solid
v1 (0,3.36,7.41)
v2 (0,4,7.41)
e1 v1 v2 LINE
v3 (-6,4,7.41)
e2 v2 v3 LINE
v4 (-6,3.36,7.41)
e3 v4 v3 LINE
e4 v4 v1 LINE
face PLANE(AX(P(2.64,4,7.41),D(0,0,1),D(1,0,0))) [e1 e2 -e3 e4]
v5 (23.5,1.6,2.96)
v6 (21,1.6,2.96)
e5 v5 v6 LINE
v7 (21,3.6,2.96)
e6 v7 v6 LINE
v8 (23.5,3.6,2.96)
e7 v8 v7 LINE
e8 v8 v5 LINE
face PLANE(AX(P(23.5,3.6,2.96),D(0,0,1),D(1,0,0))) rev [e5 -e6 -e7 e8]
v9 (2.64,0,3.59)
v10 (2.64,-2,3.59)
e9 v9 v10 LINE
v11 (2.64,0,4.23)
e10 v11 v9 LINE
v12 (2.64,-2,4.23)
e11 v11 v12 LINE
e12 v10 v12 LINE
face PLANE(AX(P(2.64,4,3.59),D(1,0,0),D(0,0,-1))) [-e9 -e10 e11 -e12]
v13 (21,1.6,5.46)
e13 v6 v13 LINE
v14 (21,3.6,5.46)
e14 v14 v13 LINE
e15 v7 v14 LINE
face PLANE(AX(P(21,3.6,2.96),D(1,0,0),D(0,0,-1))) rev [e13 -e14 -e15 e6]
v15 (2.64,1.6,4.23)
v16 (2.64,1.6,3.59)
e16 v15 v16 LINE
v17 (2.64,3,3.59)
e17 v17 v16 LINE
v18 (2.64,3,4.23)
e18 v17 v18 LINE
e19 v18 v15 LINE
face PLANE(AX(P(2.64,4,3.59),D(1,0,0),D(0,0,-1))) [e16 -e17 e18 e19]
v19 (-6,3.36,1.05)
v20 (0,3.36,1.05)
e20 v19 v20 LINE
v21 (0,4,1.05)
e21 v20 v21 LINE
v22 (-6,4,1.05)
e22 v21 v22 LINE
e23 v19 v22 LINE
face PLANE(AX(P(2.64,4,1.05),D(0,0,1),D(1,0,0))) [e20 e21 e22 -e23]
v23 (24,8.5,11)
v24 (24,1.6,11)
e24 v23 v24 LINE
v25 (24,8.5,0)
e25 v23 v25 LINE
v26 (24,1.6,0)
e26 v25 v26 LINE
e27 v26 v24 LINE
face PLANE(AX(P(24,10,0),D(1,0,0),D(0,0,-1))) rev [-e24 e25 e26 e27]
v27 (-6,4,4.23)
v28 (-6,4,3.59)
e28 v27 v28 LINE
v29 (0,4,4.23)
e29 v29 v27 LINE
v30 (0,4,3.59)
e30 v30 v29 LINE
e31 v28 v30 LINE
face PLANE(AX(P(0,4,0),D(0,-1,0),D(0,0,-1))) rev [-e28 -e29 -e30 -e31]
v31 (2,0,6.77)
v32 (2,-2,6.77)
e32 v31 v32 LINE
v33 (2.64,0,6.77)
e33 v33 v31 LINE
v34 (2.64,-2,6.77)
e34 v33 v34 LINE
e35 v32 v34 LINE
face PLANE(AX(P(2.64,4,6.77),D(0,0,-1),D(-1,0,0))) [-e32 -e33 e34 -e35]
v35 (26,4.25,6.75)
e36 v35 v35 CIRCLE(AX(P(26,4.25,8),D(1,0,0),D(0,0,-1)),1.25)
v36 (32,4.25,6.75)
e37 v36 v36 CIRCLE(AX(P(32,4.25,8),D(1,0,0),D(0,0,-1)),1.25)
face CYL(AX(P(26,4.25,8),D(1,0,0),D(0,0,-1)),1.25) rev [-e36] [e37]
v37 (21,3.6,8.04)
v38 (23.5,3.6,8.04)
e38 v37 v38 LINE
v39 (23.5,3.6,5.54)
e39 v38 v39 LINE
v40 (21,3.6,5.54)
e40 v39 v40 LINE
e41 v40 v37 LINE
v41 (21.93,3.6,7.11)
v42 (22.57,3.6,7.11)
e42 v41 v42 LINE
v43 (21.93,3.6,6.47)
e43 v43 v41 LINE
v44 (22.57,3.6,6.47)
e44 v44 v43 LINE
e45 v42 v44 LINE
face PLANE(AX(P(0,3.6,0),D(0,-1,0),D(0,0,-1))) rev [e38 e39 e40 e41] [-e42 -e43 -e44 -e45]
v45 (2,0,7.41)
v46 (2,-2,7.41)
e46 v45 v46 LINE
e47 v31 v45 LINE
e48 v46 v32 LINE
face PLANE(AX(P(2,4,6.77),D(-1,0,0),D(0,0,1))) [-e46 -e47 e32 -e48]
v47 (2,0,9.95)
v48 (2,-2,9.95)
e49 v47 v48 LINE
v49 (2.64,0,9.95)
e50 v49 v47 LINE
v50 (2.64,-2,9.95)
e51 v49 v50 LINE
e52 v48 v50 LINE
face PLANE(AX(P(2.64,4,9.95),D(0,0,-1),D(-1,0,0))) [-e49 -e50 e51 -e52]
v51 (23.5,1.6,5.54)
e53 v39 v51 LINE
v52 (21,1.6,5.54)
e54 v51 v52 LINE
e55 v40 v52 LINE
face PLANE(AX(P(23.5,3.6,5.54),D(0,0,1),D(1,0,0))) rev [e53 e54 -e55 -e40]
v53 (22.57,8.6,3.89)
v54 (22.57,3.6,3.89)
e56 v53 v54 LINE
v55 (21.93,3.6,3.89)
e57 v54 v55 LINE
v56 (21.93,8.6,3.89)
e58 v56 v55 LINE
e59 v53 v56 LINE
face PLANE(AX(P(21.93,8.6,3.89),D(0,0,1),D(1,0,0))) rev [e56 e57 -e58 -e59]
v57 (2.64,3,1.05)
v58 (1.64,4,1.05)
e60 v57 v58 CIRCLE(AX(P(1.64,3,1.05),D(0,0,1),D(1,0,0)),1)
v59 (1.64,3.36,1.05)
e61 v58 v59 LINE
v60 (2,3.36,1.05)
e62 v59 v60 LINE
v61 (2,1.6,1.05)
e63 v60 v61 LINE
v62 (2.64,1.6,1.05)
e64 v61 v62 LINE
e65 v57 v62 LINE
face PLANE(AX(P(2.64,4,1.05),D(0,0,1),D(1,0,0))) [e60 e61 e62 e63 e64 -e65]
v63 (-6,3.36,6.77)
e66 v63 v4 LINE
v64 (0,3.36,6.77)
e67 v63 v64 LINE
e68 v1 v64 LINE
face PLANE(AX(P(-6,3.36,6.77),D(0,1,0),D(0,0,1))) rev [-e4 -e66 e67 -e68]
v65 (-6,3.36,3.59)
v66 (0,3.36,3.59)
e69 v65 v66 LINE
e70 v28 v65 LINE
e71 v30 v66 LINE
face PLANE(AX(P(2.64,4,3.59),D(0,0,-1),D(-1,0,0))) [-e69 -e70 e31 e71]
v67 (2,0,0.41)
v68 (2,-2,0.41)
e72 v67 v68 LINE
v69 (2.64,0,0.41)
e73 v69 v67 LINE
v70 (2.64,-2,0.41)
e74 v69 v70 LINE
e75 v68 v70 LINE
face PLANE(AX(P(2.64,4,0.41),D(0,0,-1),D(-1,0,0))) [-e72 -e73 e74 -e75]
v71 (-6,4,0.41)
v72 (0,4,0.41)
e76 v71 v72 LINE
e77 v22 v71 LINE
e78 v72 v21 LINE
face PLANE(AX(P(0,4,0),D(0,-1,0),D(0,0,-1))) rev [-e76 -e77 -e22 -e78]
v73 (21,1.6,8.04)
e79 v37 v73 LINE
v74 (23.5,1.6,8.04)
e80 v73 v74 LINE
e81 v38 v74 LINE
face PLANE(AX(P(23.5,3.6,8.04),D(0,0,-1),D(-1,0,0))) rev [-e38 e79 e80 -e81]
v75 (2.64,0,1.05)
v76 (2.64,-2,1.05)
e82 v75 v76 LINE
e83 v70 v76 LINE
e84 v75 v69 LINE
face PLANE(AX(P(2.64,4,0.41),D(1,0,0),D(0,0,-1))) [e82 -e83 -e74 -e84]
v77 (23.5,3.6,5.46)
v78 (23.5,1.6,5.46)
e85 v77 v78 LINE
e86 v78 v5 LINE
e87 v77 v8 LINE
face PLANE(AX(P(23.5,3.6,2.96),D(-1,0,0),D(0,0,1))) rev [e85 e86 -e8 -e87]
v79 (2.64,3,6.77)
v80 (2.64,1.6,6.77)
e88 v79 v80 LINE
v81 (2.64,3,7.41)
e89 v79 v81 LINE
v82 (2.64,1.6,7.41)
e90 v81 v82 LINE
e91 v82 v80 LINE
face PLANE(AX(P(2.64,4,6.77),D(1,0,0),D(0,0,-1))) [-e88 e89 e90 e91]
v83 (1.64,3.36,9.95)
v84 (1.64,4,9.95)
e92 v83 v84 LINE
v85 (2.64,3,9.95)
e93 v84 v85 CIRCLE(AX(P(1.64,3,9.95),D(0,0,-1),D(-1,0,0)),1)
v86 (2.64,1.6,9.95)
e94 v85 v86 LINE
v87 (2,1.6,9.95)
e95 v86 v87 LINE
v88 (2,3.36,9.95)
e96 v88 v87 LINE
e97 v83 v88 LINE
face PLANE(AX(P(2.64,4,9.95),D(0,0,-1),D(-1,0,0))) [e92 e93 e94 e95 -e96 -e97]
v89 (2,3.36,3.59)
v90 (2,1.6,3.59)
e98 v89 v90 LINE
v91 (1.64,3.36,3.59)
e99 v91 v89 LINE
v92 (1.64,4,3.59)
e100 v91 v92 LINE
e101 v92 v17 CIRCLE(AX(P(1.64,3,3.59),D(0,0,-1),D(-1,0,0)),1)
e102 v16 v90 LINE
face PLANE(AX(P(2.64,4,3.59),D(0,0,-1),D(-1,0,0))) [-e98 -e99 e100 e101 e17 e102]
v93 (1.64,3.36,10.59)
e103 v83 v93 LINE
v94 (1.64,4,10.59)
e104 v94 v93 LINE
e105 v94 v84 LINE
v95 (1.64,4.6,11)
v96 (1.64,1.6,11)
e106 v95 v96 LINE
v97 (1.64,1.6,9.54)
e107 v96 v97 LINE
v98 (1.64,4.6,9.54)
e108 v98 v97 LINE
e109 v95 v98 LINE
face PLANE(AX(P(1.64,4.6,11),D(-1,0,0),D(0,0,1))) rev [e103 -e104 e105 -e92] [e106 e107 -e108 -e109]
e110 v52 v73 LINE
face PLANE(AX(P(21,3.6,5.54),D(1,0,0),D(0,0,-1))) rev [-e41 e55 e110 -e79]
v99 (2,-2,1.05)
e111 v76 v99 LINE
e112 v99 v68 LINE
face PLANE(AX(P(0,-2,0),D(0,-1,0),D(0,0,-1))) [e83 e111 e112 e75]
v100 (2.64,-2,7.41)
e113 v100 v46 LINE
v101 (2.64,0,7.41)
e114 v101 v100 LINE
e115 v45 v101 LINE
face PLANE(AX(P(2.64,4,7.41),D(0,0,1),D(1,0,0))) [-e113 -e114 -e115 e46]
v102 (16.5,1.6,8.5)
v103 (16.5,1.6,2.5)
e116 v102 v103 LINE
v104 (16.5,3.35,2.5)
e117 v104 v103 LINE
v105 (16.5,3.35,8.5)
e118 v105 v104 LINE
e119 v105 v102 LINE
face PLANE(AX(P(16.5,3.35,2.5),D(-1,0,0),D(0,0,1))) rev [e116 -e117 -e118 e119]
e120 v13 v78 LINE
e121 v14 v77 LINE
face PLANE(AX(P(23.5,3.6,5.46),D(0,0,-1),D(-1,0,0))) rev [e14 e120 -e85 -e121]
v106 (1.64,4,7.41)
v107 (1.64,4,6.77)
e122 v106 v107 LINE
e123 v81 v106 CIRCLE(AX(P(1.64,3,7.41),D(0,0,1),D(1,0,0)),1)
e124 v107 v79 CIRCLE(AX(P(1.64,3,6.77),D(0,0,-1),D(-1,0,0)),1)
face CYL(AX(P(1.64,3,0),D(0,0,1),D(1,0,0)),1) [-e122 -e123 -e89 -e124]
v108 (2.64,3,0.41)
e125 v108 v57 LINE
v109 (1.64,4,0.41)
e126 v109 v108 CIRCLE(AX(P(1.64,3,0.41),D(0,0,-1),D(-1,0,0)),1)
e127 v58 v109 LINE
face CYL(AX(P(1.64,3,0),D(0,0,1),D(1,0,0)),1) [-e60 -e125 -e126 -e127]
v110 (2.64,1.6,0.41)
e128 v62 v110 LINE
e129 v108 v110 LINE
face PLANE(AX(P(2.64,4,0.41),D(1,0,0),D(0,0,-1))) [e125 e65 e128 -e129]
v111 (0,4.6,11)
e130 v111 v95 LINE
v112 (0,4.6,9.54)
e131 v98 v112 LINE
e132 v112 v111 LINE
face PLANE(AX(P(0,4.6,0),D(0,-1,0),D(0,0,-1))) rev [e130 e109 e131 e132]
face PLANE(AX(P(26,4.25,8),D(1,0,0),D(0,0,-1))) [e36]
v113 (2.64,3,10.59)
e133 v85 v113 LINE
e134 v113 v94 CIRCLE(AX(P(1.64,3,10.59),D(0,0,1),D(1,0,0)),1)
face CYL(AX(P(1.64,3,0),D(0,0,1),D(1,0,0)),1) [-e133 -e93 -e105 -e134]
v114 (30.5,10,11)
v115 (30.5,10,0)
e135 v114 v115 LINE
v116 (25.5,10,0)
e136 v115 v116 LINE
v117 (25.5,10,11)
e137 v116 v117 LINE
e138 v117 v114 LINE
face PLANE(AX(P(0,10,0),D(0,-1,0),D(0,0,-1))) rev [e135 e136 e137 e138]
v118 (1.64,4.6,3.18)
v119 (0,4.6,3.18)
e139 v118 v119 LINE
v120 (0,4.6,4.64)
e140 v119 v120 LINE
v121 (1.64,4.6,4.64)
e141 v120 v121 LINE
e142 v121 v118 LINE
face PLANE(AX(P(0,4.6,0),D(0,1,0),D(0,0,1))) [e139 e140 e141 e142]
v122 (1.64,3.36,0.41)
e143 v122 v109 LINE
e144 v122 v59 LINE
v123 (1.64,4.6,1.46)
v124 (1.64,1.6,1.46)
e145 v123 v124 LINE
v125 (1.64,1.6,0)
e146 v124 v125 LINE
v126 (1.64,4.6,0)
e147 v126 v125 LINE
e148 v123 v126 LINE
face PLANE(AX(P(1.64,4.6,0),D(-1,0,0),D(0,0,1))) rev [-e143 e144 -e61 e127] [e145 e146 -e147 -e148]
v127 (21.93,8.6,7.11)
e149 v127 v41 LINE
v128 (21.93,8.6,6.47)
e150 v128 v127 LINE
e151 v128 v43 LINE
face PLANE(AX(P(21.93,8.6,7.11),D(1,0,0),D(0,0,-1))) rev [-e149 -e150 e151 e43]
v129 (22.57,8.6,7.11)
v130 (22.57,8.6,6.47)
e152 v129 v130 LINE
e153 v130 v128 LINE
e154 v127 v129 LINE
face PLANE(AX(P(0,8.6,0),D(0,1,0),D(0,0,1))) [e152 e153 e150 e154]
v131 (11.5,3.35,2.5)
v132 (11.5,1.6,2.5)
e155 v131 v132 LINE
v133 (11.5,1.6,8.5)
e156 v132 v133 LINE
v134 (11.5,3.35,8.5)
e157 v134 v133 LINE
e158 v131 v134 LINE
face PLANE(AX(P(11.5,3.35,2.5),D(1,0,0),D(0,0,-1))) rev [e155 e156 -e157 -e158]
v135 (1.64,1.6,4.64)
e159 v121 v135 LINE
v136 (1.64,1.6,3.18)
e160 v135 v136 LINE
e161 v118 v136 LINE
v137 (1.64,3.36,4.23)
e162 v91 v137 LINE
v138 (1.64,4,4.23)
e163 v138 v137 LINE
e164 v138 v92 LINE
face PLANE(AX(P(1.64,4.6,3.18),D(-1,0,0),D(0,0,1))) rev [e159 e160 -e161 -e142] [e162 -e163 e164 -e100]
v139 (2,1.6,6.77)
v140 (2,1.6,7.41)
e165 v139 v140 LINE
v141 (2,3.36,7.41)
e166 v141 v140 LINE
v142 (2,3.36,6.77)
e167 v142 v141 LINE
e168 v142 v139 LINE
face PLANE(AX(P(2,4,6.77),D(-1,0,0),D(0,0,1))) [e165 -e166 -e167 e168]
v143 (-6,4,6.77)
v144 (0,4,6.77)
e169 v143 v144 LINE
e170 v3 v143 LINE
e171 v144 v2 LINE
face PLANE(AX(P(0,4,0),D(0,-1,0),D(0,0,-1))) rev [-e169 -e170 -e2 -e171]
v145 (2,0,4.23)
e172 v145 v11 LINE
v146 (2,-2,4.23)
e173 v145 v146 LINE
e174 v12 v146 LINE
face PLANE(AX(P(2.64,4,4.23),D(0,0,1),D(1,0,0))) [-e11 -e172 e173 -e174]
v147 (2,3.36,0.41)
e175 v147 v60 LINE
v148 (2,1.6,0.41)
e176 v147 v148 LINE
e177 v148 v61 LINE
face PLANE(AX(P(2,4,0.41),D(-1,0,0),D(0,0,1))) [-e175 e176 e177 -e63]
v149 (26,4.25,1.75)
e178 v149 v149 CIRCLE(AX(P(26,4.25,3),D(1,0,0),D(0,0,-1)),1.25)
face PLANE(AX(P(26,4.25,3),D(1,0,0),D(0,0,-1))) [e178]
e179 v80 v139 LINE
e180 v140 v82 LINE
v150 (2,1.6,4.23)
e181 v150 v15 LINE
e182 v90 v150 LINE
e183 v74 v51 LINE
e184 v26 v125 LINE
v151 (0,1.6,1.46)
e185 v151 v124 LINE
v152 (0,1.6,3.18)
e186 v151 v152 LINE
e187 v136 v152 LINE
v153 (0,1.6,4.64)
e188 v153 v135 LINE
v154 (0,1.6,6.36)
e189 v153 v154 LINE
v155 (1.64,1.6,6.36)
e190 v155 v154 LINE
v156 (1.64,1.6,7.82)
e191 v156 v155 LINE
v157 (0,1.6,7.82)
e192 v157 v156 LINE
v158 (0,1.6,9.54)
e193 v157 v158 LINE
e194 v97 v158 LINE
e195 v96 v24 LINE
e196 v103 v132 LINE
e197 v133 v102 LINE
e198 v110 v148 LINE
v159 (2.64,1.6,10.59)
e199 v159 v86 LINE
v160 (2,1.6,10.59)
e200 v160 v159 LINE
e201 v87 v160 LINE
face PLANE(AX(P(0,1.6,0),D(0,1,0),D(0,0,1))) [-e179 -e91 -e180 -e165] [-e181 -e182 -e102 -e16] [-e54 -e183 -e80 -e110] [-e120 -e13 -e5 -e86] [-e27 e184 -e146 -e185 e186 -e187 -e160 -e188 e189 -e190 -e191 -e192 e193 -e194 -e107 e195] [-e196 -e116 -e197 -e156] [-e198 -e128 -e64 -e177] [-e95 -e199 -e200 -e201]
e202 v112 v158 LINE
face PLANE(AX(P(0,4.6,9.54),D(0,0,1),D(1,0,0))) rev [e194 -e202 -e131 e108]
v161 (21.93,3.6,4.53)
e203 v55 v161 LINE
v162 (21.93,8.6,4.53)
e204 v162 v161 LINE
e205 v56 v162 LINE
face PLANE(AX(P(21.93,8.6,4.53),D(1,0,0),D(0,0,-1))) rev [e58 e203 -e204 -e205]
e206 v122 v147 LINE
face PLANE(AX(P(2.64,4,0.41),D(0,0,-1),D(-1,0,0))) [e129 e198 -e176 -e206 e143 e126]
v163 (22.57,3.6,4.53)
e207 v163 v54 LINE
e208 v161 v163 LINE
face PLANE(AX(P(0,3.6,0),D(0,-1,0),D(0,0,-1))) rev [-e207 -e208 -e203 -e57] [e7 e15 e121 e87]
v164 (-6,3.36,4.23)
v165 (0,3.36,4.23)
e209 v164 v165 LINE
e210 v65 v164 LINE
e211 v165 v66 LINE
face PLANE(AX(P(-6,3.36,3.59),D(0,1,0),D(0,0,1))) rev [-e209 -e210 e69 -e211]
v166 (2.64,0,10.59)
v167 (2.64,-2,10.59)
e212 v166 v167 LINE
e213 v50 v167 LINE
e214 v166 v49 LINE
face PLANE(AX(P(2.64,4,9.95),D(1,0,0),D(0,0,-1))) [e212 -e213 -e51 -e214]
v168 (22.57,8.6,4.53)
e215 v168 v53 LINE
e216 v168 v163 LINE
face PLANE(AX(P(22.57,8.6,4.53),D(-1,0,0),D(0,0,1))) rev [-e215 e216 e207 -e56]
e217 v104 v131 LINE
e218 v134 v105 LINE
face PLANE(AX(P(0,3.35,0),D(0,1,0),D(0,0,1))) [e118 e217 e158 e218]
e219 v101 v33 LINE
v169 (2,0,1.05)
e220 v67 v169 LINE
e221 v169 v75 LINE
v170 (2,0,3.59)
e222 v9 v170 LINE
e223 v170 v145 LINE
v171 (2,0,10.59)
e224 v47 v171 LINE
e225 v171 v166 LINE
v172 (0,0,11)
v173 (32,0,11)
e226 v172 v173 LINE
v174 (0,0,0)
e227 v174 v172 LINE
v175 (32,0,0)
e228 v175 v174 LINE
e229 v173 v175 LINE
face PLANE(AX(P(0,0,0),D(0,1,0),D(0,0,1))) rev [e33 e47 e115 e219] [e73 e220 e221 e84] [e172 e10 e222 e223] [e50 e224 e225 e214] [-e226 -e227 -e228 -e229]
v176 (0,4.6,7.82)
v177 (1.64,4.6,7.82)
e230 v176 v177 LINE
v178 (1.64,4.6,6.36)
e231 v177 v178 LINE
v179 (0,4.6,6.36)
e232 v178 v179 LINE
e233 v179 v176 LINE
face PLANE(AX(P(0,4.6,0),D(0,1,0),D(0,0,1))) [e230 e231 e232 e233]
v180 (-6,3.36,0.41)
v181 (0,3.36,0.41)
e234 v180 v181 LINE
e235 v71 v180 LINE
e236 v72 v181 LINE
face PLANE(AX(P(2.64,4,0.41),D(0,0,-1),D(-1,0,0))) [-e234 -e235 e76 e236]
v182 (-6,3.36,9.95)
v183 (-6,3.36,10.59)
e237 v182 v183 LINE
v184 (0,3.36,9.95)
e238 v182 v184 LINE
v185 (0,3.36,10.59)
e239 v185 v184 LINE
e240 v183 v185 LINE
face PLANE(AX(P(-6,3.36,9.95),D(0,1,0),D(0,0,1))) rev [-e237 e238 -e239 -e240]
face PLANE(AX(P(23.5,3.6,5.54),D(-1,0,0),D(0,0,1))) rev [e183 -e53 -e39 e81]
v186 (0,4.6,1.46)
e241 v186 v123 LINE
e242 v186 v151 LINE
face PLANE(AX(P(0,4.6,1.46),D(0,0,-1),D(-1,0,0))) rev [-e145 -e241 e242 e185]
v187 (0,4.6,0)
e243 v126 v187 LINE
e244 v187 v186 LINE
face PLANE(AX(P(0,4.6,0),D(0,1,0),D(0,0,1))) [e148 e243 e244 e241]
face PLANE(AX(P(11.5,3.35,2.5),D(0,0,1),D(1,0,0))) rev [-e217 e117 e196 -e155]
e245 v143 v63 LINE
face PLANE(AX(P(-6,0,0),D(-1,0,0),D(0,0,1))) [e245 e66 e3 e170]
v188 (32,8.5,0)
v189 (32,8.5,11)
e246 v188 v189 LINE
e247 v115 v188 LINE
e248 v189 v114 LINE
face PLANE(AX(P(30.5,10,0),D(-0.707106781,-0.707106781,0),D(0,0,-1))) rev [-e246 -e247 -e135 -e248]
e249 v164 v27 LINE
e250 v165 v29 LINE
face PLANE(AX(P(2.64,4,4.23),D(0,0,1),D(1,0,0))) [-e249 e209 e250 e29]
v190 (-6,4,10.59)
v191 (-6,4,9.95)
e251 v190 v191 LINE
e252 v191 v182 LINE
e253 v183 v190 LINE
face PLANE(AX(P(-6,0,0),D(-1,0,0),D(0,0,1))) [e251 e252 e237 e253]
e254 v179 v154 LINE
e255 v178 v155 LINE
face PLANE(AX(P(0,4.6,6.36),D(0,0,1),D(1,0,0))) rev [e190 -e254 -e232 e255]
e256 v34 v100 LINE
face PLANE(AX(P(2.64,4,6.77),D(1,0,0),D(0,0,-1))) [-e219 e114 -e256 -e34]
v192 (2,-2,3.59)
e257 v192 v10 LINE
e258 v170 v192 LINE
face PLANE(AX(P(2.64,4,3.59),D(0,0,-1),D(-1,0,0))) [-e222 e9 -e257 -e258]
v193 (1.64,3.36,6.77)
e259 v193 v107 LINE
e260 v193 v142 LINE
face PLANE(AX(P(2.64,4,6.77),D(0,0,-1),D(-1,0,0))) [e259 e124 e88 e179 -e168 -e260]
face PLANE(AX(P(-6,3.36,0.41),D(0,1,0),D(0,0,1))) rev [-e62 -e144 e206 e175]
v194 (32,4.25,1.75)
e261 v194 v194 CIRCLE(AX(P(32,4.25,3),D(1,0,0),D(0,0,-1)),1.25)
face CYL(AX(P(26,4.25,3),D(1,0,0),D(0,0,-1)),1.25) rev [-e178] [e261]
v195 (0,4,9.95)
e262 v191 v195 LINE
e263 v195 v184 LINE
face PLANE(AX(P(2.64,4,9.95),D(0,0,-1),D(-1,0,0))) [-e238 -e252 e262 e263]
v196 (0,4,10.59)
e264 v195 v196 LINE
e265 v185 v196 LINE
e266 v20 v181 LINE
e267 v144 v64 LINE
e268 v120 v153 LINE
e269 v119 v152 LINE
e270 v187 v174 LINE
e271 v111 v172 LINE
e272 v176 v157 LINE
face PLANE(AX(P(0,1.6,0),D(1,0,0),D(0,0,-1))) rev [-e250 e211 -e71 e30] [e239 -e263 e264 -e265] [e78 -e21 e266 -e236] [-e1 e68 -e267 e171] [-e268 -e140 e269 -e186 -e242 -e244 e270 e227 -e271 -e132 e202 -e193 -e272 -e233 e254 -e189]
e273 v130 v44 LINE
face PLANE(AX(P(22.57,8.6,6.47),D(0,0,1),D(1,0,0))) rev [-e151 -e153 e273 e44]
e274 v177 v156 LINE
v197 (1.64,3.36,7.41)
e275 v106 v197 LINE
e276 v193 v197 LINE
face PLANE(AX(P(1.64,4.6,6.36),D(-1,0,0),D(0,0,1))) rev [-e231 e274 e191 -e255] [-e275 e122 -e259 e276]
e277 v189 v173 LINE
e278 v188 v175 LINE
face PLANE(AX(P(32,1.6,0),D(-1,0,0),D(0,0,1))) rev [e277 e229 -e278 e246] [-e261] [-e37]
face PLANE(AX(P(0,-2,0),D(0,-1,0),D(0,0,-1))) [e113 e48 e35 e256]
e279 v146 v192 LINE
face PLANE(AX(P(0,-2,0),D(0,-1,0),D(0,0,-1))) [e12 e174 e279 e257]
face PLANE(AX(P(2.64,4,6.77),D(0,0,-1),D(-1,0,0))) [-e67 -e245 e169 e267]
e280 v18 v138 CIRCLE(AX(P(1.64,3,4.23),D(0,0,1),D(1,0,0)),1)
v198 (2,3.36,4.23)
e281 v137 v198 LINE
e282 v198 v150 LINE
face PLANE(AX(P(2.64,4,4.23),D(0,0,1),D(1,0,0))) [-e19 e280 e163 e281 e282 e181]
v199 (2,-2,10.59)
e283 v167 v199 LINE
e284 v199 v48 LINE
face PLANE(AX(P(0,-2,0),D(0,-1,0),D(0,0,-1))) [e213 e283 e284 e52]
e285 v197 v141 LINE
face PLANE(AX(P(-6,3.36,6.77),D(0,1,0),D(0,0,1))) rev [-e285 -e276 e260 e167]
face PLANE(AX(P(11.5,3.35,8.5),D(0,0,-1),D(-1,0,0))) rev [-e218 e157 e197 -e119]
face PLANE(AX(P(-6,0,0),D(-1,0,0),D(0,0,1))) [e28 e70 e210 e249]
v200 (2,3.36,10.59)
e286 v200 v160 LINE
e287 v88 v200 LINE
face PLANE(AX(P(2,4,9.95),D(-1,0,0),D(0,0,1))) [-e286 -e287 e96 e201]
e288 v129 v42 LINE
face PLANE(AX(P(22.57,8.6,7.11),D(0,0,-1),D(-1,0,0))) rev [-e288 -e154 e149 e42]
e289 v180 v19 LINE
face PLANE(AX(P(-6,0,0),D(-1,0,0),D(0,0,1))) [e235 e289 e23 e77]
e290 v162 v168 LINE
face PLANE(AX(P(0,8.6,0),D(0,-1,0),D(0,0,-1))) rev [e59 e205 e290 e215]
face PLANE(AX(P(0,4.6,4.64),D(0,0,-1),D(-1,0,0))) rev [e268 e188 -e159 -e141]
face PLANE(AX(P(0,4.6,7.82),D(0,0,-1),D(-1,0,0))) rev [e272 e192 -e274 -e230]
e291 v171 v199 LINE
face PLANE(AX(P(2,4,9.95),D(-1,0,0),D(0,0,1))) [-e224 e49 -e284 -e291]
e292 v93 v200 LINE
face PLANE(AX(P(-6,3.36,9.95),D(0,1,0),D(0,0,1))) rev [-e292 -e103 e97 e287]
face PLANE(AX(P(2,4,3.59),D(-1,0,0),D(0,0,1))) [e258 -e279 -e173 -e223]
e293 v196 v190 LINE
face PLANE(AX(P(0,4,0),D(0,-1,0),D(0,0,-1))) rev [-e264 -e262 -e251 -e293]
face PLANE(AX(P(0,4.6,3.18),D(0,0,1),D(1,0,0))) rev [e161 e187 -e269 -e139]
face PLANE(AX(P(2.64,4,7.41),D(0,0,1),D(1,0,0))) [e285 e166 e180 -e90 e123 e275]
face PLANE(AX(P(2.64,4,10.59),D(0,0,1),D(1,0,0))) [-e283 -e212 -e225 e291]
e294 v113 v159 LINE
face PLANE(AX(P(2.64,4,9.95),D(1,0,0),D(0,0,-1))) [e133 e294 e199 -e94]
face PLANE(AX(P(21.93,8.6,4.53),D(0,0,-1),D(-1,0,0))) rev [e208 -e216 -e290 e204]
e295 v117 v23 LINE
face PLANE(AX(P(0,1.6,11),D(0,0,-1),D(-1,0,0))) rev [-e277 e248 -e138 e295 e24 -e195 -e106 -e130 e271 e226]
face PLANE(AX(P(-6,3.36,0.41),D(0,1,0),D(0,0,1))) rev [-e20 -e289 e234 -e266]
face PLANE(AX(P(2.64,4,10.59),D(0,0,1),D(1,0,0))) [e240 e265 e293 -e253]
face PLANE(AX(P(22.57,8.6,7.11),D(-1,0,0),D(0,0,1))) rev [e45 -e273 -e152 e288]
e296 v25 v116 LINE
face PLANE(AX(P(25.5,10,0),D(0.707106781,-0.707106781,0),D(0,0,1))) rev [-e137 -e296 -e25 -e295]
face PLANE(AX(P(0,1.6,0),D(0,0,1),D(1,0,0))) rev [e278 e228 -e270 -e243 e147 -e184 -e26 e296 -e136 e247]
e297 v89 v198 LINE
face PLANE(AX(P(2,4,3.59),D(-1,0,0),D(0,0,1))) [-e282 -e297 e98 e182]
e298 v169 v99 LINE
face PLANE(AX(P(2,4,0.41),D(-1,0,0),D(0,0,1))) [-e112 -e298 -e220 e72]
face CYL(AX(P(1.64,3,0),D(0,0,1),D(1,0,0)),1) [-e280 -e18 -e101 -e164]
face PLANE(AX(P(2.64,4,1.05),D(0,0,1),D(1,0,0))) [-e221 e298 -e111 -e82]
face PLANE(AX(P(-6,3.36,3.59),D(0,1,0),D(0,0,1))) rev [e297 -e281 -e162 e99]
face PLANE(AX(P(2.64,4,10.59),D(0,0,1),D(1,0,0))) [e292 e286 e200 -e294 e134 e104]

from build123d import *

# Parameters (mm, degrees)
SKETCH_1_W           = 32
SKETCH_1_H           = 11
EXTRUDE_1_DEPTH      = 1.6
SKETCH_2_W           = 0.64
SKETCH_2_H           = 0.64
EXTRUDE_2_DEPTH      = 6
SKETCH_3_W           = 0.64
SKETCH_3_H           = 0.64
EXTRUDE_3_DEPTH      = 8
FILLET_2_R           = 1
FILLET_3_R           = 1
FILLET_4_R           = 1
FILLET_5_R           = 1
SKETCH_4_W           = 8
SKETCH_4_H           = 11
EXTRUDE_4_DEPTH      = 8.4
FILLET_START         = 9
FILLET_4_2_OUTLINE_W = 6
FILLET_4_2_OUTLINE_H = 13
FILLET_4_2_DEPTH     = 1.960155108
FILLET_START_2       = 28.637824638
FILLET_5_2_OUTLINE_W = 5
FILLET_5_2_OUTLINE_H = 13
FILLET_5_2_DEPTH     = 2.362175362
SKETCH_5_R           = 1.25
CUT_EXTRUDE_1_DEPTH  = 6
SKETCH_6_W           = 2.5
SKETCH_6_H           = 2.5
EXTRUDE_5_DEPTH      = 2
SKETCH_7_W           = 0.64
SKETCH_7_H           = 0.64
EXTRUDE_6_DEPTH      = 5
SKETCH_8_W           = 5
SKETCH_8_H           = 6
EXTRUDE_7_DEPTH      = 1.75
SKETCH_9_W           = 1.64
SKETCH_9_H           = 1.46
EXTRUDE_8_DEPTH      = 3


with BuildPart() as part:
    # Эскиз1 → Бобышка-Вытянуть1 (new body)
    with BuildSketch(Plane(origin=(0, 0, 0), x_dir=(1, 0, 0), z_dir=(0, 1, 0))):
        with Locations((16, -5.5)):
            Rectangle(SKETCH_1_W, SKETCH_1_H)
    extrude(amount=EXTRUDE_1_DEPTH)

    # Эскиз2 → Бобышка-Вытянуть2 (add)
    with BuildSketch(Plane(origin=(0, -2, 0), x_dir=(-1, 0, 0), z_dir=(0, -1, 0))):
        with Locations((-2.32, -0.73)):
            Rectangle(SKETCH_2_W, SKETCH_2_H)
        with Locations((-2.32, -3.91)):
            Rectangle(SKETCH_2_W, SKETCH_2_H)
        with Locations((-2.32, -7.09)):
            Rectangle(SKETCH_2_W, SKETCH_2_H)
        with Locations((-2.32, -10.27)):
            Rectangle(SKETCH_2_W, SKETCH_2_H)
    extrude(amount=-EXTRUDE_2_DEPTH)

    # Эскиз3 → Бобышка-Вытянуть3 (add)
    with BuildSketch(Plane.ZY.offset(-2)):
        with Locations((0.73, 3.68)):
            Rectangle(SKETCH_3_W, SKETCH_3_H)
        with Locations((3.91, 3.68)):
            Rectangle(SKETCH_3_W, SKETCH_3_H)
        with Locations((7.09, 3.68)):
            Rectangle(SKETCH_3_W, SKETCH_3_H)
        with Locations((10.27, 3.68)):
            Rectangle(SKETCH_3_W, SKETCH_3_H)
    extrude(amount=EXTRUDE_3_DEPTH)

    # Скругление2
    fillet_2_edges = [part.edges().sort_by_distance(p)[0] for p in [
        (2.64, 4, 10.27),
    ]]
    fillet(fillet_2_edges, radius=FILLET_2_R)

    # Скругление3
    fillet_3_edges = [part.edges().sort_by_distance(p)[0] for p in [
        (2.64, 4, 0.73),
    ]]
    fillet(fillet_3_edges, radius=FILLET_3_R)

    # Fillet 4
    fillet_4_edges = [part.edges().sort_by_distance(p)[0] for p in [
        (2.64, 4, 3.91),
    ]]
    fillet(fillet_4_edges, radius=FILLET_4_R)

    # Fillet 5
    fillet_5_edges = [part.edges().sort_by_distance(p)[0] for p in [
        (2.64, 4, 7.09),
    ]]
    fillet(fillet_5_edges, radius=FILLET_5_R)

    # Эскиз4 → Бобышка-Вытянуть4 (add)
    with BuildSketch(Plane(origin=(0, 1.6, 0), x_dir=(1, 0, 0), z_dir=(0, 1, 0))):
        with Locations((28, -5.5)):
            Rectangle(SKETCH_4_W, SKETCH_4_H)
    extrude(amount=EXTRUDE_4_DEPTH)

    # Fillet 4 2: read off the stored shape, not the designer's step
    # Fillet 4 2 outline → Fillet 4 2 (cut)
    with BuildSketch(Plane(origin=(0, 0, 0), x_dir=(0.707106781186548, 0.707106781186547, 0), z_dir=(0.707106781186547, -0.707106781186548, 0)).offset(FILLET_START)):
        with Locations((24, 5.5)):
            Rectangle(FILLET_4_2_OUTLINE_W, FILLET_4_2_OUTLINE_H)
    extrude(amount=FILLET_4_2_DEPTH, mode=Mode.SUBTRACT)

    # Fillet 5 2: read off the stored shape, not the designer's step
    # Fillet 5 2 outline → Fillet 5 2 (cut)
    with BuildSketch(Plane(origin=(0, 0, 0), x_dir=(0.707106781186548, -0.707106781186547, 0), z_dir=(0.707106781186547, 0.707106781186548, 0)).offset(FILLET_START_2)):
        with Locations((15.5, -5.5)):
            Rectangle(FILLET_5_2_OUTLINE_W, FILLET_5_2_OUTLINE_H)
    extrude(amount=FILLET_5_2_DEPTH, mode=Mode.SUBTRACT)

    # Эскиз5 → Вырез-Вытянуть1 (cut)
    with BuildSketch(Plane(origin=(32, 0, 0), x_dir=(0, 0, -1), z_dir=(1, 0, 0))):
        with Locations((-8, 4.25)):
            Circle(SKETCH_5_R)
        with Locations((-3, 4.25)):
            Circle(SKETCH_5_R)
    extrude(amount=-CUT_EXTRUDE_1_DEPTH, mode=Mode.SUBTRACT)

    # Эскиз6 → Бобышка-Вытянуть5 (add)
    with BuildSketch(Plane(origin=(0, 1.6, 0), x_dir=(1, 0, 0), z_dir=(0, 1, 0))):
        with Locations((22.25, -4.21)):
            Rectangle(SKETCH_6_W, SKETCH_6_H)
        with Locations((22.25, -6.79)):
            Rectangle(SKETCH_6_W, SKETCH_6_H)
    extrude(amount=EXTRUDE_5_DEPTH)

    # Эскиз7 → Бобышка-Вытянуть6 (add)
    with BuildSketch(Plane(origin=(0, 3.6, 0), x_dir=(1, 0, 0), z_dir=(0, 1, 0))):
        with Locations((22.25, -4.21)):
            Rectangle(SKETCH_7_W, SKETCH_7_H)
        with Locations((22.25, -6.79)):
            Rectangle(SKETCH_7_W, SKETCH_7_H)
    extrude(amount=EXTRUDE_6_DEPTH)

    # Эскиз8 → Бобышка-Вытянуть7 (add)
    with BuildSketch(Plane(origin=(0, 1.6, 0), x_dir=(1, 0, 0), z_dir=(0, 1, 0))):
        with Locations((14, -5.5)):
            Rectangle(SKETCH_8_W, SKETCH_8_H)
    extrude(amount=EXTRUDE_7_DEPTH)

    # Эскиз9 → Бобышка-Вытянуть8 (add)
    with BuildSketch(Plane(origin=(0, 1.6, 0), x_dir=(1, 0, 0), z_dir=(0, 1, 0))):
        with Locations((0.82, -0.73)):
            Rectangle(SKETCH_9_W, SKETCH_9_H)
        with Locations((0.82, -3.91)):
            Rectangle(SKETCH_9_W, SKETCH_9_H)
        with Locations((0.82, -7.09)):
            Rectangle(SKETCH_9_W, SKETCH_9_H)
        with Locations((0.82, -10.27)):
            Rectangle(SKETCH_9_W, SKETCH_9_H)
    extrude(amount=EXTRUDE_8_DEPTH)


solid = part.part
